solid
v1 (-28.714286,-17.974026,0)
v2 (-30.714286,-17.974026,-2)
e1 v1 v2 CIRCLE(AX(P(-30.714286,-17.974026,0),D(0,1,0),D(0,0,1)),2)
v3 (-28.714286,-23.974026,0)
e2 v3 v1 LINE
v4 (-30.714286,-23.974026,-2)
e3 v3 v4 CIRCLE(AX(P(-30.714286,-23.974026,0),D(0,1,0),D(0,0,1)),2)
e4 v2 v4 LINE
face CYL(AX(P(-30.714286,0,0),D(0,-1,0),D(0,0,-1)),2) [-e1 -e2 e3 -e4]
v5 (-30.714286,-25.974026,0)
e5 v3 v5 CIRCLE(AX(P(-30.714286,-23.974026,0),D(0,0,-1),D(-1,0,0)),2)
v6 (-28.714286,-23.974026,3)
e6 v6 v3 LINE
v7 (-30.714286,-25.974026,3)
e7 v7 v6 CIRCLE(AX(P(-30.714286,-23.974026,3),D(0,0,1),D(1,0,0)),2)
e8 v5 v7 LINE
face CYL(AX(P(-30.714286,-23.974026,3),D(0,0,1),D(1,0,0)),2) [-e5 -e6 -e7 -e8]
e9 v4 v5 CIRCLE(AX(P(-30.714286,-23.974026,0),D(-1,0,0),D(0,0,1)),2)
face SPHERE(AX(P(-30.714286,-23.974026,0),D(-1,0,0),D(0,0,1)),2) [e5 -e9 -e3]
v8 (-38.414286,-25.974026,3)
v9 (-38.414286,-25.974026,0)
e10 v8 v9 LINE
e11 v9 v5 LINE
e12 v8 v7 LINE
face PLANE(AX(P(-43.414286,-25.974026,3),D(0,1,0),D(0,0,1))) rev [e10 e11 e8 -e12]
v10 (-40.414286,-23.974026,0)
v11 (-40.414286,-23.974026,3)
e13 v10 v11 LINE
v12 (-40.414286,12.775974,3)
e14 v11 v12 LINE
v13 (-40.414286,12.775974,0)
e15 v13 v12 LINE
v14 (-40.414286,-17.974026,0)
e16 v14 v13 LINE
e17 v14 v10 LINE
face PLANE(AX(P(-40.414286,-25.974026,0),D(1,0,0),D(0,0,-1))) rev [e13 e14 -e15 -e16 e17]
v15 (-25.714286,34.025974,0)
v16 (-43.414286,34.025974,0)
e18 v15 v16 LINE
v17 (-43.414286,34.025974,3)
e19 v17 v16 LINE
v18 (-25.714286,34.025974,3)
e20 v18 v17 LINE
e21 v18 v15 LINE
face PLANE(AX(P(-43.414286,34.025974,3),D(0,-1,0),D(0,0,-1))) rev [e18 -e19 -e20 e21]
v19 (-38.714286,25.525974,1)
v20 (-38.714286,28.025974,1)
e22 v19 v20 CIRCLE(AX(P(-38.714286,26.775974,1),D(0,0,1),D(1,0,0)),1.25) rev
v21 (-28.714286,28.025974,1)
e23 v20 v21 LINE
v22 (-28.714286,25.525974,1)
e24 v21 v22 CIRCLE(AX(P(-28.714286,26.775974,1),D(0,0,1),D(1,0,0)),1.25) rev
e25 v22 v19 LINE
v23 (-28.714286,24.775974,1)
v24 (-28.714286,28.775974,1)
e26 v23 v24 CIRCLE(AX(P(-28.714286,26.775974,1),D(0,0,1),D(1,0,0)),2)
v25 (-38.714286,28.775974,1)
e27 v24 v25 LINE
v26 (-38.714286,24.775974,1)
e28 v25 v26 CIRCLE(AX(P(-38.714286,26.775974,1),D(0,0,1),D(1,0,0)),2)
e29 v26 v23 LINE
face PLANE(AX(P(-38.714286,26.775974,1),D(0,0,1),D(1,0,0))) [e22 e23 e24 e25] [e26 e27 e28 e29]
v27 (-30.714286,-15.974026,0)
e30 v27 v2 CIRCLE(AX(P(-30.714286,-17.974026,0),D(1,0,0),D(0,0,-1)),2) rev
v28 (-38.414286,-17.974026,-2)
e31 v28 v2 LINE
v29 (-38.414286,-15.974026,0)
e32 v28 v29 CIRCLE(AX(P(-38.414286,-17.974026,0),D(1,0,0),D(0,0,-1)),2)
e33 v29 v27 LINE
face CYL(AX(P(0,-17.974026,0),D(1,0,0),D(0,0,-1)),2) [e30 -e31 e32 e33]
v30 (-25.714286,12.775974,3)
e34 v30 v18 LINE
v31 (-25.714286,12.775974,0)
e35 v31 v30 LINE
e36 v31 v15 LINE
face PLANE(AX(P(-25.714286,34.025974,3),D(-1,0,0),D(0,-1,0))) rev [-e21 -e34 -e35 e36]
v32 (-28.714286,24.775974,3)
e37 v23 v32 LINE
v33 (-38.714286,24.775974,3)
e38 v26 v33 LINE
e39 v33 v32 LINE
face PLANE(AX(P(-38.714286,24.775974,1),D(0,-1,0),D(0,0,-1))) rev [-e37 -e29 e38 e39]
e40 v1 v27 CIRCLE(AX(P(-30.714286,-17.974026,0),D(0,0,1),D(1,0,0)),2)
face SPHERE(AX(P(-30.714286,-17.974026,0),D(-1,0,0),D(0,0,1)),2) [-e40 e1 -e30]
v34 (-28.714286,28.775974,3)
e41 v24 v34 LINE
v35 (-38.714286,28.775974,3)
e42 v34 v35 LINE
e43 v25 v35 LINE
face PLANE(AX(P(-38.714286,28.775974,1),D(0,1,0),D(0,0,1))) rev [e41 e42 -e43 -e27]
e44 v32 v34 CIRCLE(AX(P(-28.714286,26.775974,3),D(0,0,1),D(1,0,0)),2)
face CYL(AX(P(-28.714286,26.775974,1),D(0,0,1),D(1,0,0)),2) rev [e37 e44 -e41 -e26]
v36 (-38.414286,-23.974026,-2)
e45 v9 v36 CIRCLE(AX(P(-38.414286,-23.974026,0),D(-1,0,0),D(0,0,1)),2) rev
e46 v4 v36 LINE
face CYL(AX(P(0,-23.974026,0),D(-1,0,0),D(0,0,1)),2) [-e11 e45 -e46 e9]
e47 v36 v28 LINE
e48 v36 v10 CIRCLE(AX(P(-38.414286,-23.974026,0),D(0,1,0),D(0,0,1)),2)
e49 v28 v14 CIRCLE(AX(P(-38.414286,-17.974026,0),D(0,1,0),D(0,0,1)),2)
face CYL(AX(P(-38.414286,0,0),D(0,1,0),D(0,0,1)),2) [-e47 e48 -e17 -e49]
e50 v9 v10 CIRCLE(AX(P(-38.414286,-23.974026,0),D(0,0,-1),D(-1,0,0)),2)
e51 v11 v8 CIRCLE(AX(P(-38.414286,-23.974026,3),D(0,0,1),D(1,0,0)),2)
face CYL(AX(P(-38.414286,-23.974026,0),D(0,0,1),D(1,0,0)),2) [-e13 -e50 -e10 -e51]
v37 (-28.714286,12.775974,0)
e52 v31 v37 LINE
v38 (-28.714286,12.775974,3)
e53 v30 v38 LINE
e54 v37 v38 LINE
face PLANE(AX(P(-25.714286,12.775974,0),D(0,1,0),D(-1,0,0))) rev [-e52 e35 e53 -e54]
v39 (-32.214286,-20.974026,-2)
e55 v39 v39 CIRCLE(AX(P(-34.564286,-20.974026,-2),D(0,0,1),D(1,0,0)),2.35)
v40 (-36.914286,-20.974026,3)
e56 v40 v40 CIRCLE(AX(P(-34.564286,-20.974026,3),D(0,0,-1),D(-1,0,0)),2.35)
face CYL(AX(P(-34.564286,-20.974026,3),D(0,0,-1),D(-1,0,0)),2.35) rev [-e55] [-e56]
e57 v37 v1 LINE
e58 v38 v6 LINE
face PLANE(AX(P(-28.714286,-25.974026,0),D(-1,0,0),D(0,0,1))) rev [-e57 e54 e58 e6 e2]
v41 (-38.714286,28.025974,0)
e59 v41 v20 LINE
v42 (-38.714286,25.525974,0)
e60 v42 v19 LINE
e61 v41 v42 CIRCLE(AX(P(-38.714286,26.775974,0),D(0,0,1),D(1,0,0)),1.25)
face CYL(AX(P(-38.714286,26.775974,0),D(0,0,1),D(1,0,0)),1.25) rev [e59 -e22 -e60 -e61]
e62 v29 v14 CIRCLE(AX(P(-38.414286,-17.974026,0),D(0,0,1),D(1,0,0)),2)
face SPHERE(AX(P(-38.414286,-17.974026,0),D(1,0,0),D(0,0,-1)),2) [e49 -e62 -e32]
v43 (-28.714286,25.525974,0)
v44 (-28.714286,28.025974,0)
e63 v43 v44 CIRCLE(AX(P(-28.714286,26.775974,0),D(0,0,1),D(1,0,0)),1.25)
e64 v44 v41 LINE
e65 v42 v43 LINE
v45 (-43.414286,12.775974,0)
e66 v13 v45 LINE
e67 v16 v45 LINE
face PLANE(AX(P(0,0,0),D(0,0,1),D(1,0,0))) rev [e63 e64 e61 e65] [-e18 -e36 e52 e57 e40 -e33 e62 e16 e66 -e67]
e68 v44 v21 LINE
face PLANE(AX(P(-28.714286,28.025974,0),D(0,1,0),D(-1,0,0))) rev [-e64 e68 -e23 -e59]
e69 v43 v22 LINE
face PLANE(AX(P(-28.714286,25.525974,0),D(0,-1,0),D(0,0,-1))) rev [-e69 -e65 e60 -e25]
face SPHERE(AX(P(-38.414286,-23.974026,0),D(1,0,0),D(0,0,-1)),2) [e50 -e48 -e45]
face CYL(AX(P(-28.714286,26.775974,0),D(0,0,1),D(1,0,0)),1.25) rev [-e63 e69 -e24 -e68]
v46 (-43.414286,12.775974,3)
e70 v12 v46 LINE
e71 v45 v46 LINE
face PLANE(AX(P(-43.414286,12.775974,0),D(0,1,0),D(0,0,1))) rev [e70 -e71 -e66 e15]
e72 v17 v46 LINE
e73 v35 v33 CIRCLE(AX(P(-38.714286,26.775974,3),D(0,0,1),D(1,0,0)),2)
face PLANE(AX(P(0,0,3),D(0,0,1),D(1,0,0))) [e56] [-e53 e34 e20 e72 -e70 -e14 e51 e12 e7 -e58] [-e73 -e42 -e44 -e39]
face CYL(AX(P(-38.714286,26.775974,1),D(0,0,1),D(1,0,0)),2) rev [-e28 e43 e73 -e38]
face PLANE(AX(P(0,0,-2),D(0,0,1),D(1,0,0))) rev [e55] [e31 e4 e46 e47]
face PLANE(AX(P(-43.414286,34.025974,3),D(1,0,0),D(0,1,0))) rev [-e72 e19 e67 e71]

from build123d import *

# Parameters (mm, degrees)
SKETCH1_W               = 17.7
SKETCH1_H               = 60
BOSS_EXTRUDE1_DEPTH     = 3
SKETCH2_W               = 3
SKETCH2_H               = 38.75
CUT_EXTRUDE1_DEPTH      = 56.240991234
CUT_EXTRUDE2_DEPTH      = 56.240991234
CUT_EXTRUDE3_DEPTH      = 2
SKETCH5_W               = 11.7
SKETCH5_H               = 10
BOSS_EXTRUDE2_DEPTH     = 2
CUT_EXTRUDE4_DEPTH      = 56.385621893
CUT_EXTRUDE4_DEPTH_BACK = 56.385621893
SKETCH6_R               = 2.35
FILLET1_R               = 2
FILLET2_R               = 2
FILLET3_R               = 2
FILLET4_R               = 2


with BuildPart() as part:
    # Sketch1 → Boss-Extrude1 (new body)
    with BuildSketch(Plane.XY):
        with Locations((-34.564285714, 4.025974026)):
            Rectangle(SKETCH1_W, SKETCH1_H)
    extrude(amount=BOSS_EXTRUDE1_DEPTH)

    # Sketch2 → Cut-Extrude1 (cut, through all)
    with BuildSketch(Plane.XY.offset(3)):
        with Locations((-41.914285714, -6.599025974)):
            Rectangle(SKETCH2_W, SKETCH2_H)
        with Locations((-27.214285714, -6.599025974)):
            Rectangle(SKETCH2_W, SKETCH2_H)
    extrude(amount=-CUT_EXTRUDE1_DEPTH, mode=Mode.SUBTRACT)

    # Sketch3 → Cut-Extrude2 (cut, through all)
    with BuildSketch(Plane.XY.offset(3)):
        with BuildLine():
            Line((-28.714285714, 25.525974026), (-38.714285714, 25.525974026))
            ThreePointArc((-38.714285714, 25.525974026), (-39.964285714, 26.775974026), (-38.714285714, 28.025974026))
            Line((-38.714285714, 28.025974026), (-28.714285714, 28.025974026))
            ThreePointArc((-28.714285714, 28.025974026), (-27.464285714, 26.775974026), (-28.714285714, 25.525974026))
        make_face()
    extrude(amount=-CUT_EXTRUDE2_DEPTH, mode=Mode.SUBTRACT)

    # Sketch4 → Cut-Extrude3 (cut)
    with BuildSketch(Plane.XY.offset(3)):
        with BuildLine():
            Line((-38.714285714, 28.775974026), (-28.714285714, 28.775974026))
            ThreePointArc((-28.714285714, 28.775974026), (-26.714285714, 26.775974026), (-28.714285714, 24.775974026))
            Line((-28.714285714, 24.775974026), (-38.714285714, 24.775974026))
            ThreePointArc((-38.714285714, 24.775974026), (-40.714285714, 26.775974026), (-38.714285714, 28.775974026))
        make_face()
    extrude(amount=-CUT_EXTRUDE3_DEPTH, mode=Mode.SUBTRACT)

    # Sketch5 → Boss-Extrude2 (add)
    with BuildSketch(Plane(origin=(0, 0, 0), x_dir=(-1, 0, 0), z_dir=(0, 0, -1))):
        with Locations((34.564285714, -20.974025974)):
            Rectangle(SKETCH5_W, SKETCH5_H)
    extrude(amount=BOSS_EXTRUDE2_DEPTH)

    # Sketch6 → Cut-Extrude4 (cut, two sides: drawn at the far end of the back side and taken through both)
    with BuildSketch(Plane(origin=(0, 0, -2), x_dir=(-1, 0, 0), z_dir=(0, 0, -1)).offset(-CUT_EXTRUDE4_DEPTH_BACK)):
        with Locations((34.564285714, -20.974025974)):
            Circle(SKETCH6_R)
    extrude(amount=CUT_EXTRUDE4_DEPTH + CUT_EXTRUDE4_DEPTH_BACK, mode=Mode.SUBTRACT)

    # Fillet1
    fillet1_edges = [part.edges().sort_by_distance(p)[0] for p in [
        (-34.564285714, -25.974025974, -2),
    ]]
    fillet(fillet1_edges, radius=FILLET1_R)

    # Fillet2
    fillet2_edges = [part.edges().sort_by_distance(p)[0] for p in [
        (-34.564285714, -15.974025974, -2),
    ]]
    fillet(fillet2_edges, radius=FILLET2_R - 0.0001)  # a hair under: the kernel refuses the full size

    # Fillet3
    fillet3_edges = [part.edges().sort_by_distance(p)[0] for p in [
        (-28.714285714, -25.974025974, 1.5),
        (-28.714285714, -25.388239536, -1.414213562),
        (-28.714285714, -20.973975974, -2),
        (-28.714285714, -16.559783122, -1.414242852),
    ]]
    fillet(fillet3_edges, radius=FILLET3_R - 0.0001)  # a hair under: the kernel refuses the full size

    # Fillet4
    fillet4_edges = [part.edges().sort_by_distance(p)[0] for p in [
        (-40.414285714, -20.973975974, -2),
        (-40.414285714, -25.974025974, 1.5),
        (-40.414285714, -25.388239536, -1.414213562),
        (-40.414285714, -16.559783122, -1.414242852),
    ]]
    fillet(fillet4_edges, radius=FILLET4_R - 0.0001)  # a hair under: the kernel refuses the full size


solid = part.part
